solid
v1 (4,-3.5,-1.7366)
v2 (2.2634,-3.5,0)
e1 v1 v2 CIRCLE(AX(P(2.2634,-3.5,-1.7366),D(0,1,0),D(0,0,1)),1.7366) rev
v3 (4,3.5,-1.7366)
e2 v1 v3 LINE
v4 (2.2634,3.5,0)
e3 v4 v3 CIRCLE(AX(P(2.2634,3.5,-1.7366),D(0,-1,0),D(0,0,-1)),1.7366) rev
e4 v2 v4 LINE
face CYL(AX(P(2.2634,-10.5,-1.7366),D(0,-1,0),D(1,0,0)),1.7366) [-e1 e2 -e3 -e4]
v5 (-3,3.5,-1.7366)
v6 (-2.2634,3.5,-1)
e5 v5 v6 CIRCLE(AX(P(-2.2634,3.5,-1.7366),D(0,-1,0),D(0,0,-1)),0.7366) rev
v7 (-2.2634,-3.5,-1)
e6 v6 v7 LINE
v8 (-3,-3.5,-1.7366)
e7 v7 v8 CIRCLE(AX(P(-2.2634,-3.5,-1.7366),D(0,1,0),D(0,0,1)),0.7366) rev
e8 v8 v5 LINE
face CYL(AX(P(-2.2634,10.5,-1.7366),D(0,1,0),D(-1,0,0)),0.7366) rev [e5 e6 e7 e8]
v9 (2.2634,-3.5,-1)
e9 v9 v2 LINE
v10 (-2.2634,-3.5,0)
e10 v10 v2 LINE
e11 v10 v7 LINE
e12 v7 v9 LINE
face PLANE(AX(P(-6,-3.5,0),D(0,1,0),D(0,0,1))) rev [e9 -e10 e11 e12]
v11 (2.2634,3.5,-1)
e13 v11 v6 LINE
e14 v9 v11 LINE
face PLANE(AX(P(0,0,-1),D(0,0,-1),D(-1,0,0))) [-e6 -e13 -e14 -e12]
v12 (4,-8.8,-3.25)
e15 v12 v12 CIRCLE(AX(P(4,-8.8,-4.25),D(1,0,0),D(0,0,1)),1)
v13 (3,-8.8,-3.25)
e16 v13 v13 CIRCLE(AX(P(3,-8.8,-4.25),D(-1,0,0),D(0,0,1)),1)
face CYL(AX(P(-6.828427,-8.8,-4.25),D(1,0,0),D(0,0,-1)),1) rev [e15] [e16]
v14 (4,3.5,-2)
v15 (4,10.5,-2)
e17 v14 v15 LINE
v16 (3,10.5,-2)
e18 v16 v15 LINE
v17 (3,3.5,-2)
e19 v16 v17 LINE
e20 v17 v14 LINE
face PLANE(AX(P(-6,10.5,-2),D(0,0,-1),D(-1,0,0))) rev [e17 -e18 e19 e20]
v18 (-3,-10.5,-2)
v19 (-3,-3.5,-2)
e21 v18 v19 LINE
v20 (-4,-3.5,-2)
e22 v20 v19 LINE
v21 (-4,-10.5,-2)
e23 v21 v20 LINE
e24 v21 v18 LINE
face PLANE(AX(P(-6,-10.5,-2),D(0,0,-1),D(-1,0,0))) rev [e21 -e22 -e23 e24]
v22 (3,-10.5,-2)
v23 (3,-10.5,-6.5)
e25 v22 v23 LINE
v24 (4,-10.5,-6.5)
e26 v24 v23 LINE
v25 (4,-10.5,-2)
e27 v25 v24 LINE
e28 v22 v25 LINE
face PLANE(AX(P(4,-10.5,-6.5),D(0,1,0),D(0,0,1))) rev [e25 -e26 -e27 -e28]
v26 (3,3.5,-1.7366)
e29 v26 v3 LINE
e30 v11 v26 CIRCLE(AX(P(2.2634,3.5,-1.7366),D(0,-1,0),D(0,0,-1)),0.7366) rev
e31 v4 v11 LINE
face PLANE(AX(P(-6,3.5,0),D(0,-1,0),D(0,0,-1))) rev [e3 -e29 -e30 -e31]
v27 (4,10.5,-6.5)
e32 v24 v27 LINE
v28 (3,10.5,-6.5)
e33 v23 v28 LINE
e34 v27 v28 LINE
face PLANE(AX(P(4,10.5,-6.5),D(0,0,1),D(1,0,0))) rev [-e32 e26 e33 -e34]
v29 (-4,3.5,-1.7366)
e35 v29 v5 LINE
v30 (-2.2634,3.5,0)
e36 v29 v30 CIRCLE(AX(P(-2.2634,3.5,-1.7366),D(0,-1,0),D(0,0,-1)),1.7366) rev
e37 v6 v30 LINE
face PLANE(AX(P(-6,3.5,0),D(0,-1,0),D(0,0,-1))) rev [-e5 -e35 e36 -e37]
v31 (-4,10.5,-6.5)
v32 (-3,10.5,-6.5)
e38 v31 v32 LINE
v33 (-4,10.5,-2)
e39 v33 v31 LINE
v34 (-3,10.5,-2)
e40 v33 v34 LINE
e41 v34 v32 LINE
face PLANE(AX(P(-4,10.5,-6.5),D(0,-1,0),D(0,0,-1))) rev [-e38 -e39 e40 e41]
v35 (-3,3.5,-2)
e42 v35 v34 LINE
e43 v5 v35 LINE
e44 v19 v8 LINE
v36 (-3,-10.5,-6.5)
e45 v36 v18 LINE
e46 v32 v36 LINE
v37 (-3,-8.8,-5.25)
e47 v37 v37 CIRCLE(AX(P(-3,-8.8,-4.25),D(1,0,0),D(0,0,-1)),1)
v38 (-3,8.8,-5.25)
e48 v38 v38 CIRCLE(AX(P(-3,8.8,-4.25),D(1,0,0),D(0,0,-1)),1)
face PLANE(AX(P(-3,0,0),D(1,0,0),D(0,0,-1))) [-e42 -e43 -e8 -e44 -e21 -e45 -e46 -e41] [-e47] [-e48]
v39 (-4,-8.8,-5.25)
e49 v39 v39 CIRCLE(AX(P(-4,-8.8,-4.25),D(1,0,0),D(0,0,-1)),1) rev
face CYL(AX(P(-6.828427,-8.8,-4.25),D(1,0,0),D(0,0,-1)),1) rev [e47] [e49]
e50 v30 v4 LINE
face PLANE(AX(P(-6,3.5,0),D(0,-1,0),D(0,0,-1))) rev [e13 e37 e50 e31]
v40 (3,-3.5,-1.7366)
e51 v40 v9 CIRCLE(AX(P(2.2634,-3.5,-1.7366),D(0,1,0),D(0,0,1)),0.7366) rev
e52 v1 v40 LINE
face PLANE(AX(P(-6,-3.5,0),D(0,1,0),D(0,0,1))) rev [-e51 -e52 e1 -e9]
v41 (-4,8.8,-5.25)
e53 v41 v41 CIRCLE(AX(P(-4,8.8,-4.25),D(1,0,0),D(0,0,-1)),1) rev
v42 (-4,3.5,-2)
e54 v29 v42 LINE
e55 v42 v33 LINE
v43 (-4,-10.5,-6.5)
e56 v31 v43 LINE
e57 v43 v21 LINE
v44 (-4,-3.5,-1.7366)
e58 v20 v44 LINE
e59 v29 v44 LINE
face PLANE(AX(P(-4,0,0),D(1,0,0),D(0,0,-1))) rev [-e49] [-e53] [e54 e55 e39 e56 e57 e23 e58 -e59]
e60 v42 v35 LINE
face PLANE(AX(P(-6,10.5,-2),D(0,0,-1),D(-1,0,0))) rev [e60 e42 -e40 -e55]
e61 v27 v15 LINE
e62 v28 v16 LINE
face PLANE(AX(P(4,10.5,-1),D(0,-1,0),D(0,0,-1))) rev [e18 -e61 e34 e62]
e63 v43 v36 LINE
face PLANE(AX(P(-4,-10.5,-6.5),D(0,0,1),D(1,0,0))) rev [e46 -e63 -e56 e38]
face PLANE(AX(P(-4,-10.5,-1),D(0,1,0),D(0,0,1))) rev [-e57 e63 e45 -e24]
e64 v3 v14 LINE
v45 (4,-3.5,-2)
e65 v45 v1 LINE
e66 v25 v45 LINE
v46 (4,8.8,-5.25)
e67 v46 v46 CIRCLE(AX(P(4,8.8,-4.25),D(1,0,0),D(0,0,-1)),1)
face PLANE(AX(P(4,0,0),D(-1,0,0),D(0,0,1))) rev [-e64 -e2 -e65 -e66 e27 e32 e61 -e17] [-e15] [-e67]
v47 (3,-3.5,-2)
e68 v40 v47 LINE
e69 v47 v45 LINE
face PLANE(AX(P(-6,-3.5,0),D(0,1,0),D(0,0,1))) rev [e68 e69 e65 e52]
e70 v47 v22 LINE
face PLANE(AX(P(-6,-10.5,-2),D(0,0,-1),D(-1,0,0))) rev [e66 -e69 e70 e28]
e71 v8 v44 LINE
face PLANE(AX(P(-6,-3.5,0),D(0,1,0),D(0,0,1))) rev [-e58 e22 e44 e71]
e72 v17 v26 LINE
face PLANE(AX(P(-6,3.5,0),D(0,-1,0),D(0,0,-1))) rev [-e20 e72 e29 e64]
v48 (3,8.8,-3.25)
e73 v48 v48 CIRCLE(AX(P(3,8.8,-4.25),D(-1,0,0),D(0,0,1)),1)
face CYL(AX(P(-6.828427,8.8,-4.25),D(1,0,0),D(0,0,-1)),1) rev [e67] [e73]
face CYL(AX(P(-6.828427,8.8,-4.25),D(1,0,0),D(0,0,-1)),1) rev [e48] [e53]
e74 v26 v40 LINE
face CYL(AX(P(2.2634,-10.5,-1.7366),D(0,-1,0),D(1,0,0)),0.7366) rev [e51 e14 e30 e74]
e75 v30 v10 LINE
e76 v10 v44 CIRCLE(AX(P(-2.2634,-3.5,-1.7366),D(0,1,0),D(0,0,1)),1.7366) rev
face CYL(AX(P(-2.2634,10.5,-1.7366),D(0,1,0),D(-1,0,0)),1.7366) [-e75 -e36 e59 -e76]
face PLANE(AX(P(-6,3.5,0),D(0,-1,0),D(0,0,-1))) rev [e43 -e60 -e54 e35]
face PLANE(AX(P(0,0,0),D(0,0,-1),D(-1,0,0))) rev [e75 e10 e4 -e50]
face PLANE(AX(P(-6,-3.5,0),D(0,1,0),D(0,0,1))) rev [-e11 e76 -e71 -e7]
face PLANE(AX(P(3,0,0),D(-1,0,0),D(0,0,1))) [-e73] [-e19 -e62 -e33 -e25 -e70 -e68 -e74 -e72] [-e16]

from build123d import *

# Parameters (mm, degrees)
CROQUIS1_W                         = 8
CROQUIS1_H                         = 21
BRIDA_BASE1_DEPTH                  = 1
BRIDA_DE_ARISTA1_STRIP_W           = 5.4732
BRIDA_DE_ARISTA1_STRIP_H           = 1
BRIDA_DE_ARISTA1_STRIP_CUT_DEPTH   = 21
BRIDA_DE_ARISTA1_STRIP_2_W         = 5.4732
BRIDA_DE_ARISTA1_STRIP_2_H         = 1
BRIDA_DE_ARISTA1_STRIP_CUT_2_DEPTH = 21
BRIDA_DE_ARISTA1_DEPTH             = 21
BRIDA_DE_ARISTA1_BEND_DEPTH        = 21
CROQUIS34_W                        = 2
CROQUIS34_H                        = 7
CORTAR_EXTRUIR1_DEPTH              = 10
CORTAR_EXTRUIR2_REACH              = 16.714
CROQUIS35_R                        = 1


# Sheet-metal steps are written as plain solids
with BuildPart() as part:
    # Croquis1 → Brida base1 (new body)
    with BuildSketch(Plane.XY):
        Rectangle(CROQUIS1_W, CROQUIS1_H)
    extrude(amount=-BRIDA_BASE1_DEPTH)

    # Brida de arista1 strip (across the edge) → Brida de arista1 strip cut (cut)
    with BuildSketch(Plane(origin=(-4, -10.5, -1), x_dir=(1, 0, 0), z_dir=(0, 1, 0))):
        with Locations((-1, -0.5)):
            Rectangle(BRIDA_DE_ARISTA1_STRIP_W, BRIDA_DE_ARISTA1_STRIP_H)
    extrude(amount=BRIDA_DE_ARISTA1_STRIP_CUT_DEPTH, mode=Mode.SUBTRACT)

    # Brida de arista1 strip 2 (across the edge) → Brida de arista1 strip cut 2 (cut)
    with BuildSketch(Plane(origin=(4, 10.5, -1), x_dir=(-1, 0, 0), z_dir=(0, -1, 0))):
        with Locations((-1, -0.5)):
            Rectangle(BRIDA_DE_ARISTA1_STRIP_2_W, BRIDA_DE_ARISTA1_STRIP_2_H)
    extrude(amount=BRIDA_DE_ARISTA1_STRIP_CUT_2_DEPTH, mode=Mode.SUBTRACT)

    # Brida de arista1 section (across the edge) → Brida de arista1 (add)
    with BuildSketch(Plane(origin=(-4, -10.5, -1), x_dir=(1, 0, 0), z_dir=(0, 1, 0))):
        with BuildLine():
            Line((0, 0.7366), (0, 5.5))
            Line((0, 5.5), (1, 5.5))
            Line((1, 5.5), (1, 0.7366))
            ThreePointArc((1, 0.7366), (1.215745145, 0.215745145), (1.7366, 0))
            Line((1.7366, 0), (1.7366, -1))
            ThreePointArc((1.7366, -1), (0.508638364, -0.491361636), (0, 0.7366))
        make_face()
    extrude(amount=BRIDA_DE_ARISTA1_DEPTH)

    # Brida de arista1 section 2 (across the edge) → Brida de arista1 bend (add)
    with BuildSketch(Plane(origin=(4, 10.5, -1), x_dir=(-1, 0, 0), z_dir=(0, -1, 0))):
        with BuildLine():
            Line((0, 0.7366), (0, 5.5))
            Line((0, 5.5), (1, 5.5))
            Line((1, 5.5), (1, 0.7366))
            ThreePointArc((1, 0.7366), (1.215745145, 0.215745145), (1.7366, 0))
            Line((1.7366, 0), (1.7366, -1))
            ThreePointArc((1.7366, -1), (0.508638364, -0.491361636), (0, 0.7366))
        make_face()
    extrude(amount=BRIDA_DE_ARISTA1_BEND_DEPTH)

    # Croquis34 → Cortar-Extruir1 (cut)
    with BuildSketch(Plane(origin=(4, 0, 0), x_dir=(0, 0, -1), z_dir=(1, 0, 0))):
        with Locations((1, 7)):
            Rectangle(CROQUIS34_W, CROQUIS34_H)
        with Locations((1, -7)):
            Rectangle(CROQUIS34_W, CROQUIS34_H)
    extrude(amount=-CORTAR_EXTRUIR1_DEPTH, mode=Mode.SUBTRACT)

    # Cortar-Extruir2: up to this face of the body (flat: up to its plane)
    cortar_extruir2_end = Plane(part.part.faces().sort_by_distance((-4, 0, -4.204419709))[0])
    # Croquis35 → Cortar-Extruir2 (cut, up to the picked face)
    with BuildSketch(Plane(origin=(4, 0, 0), x_dir=(0, 0, -1), z_dir=(1, 0, 0)), mode=Mode.PRIVATE) as cortar_extruir2_sk1:
        with Locations((4.25, 8.8)):
            Circle(CROQUIS35_R)
    cortar_extruir2_tool1 = split(extrude(cortar_extruir2_sk1.sketch, amount=-CORTAR_EXTRUIR2_REACH, mode=Mode.PRIVATE), bisect_by=cortar_extruir2_end, keep=Keep.BOTH, mode=Mode.PRIVATE)
    # Croquis35 → Cortar-Extruir2 (cut, up to the picked face)
    with BuildSketch(Plane(origin=(4, 0, 0), x_dir=(0, 0, -1), z_dir=(1, 0, 0)), mode=Mode.PRIVATE) as cortar_extruir2_sk2:
        with Locations(Location((4.25, -8.8, 0), (0, 0, 180))):
            Circle(CROQUIS35_R)
    cortar_extruir2_tool2 = split(extrude(cortar_extruir2_sk2.sketch, amount=-CORTAR_EXTRUIR2_REACH, mode=Mode.PRIVATE), bisect_by=cortar_extruir2_end, keep=Keep.BOTH, mode=Mode.PRIVATE)
    add(cortar_extruir2_tool1.solids().sort_by(Axis((4, 8.8, -4.25), (-1, 0, 0)))[0], mode=Mode.SUBTRACT)
    add(cortar_extruir2_tool2.solids().sort_by(Axis((4, -8.8, -4.25), (-1, 0, 0)))[0], mode=Mode.SUBTRACT)


solid = part.part
